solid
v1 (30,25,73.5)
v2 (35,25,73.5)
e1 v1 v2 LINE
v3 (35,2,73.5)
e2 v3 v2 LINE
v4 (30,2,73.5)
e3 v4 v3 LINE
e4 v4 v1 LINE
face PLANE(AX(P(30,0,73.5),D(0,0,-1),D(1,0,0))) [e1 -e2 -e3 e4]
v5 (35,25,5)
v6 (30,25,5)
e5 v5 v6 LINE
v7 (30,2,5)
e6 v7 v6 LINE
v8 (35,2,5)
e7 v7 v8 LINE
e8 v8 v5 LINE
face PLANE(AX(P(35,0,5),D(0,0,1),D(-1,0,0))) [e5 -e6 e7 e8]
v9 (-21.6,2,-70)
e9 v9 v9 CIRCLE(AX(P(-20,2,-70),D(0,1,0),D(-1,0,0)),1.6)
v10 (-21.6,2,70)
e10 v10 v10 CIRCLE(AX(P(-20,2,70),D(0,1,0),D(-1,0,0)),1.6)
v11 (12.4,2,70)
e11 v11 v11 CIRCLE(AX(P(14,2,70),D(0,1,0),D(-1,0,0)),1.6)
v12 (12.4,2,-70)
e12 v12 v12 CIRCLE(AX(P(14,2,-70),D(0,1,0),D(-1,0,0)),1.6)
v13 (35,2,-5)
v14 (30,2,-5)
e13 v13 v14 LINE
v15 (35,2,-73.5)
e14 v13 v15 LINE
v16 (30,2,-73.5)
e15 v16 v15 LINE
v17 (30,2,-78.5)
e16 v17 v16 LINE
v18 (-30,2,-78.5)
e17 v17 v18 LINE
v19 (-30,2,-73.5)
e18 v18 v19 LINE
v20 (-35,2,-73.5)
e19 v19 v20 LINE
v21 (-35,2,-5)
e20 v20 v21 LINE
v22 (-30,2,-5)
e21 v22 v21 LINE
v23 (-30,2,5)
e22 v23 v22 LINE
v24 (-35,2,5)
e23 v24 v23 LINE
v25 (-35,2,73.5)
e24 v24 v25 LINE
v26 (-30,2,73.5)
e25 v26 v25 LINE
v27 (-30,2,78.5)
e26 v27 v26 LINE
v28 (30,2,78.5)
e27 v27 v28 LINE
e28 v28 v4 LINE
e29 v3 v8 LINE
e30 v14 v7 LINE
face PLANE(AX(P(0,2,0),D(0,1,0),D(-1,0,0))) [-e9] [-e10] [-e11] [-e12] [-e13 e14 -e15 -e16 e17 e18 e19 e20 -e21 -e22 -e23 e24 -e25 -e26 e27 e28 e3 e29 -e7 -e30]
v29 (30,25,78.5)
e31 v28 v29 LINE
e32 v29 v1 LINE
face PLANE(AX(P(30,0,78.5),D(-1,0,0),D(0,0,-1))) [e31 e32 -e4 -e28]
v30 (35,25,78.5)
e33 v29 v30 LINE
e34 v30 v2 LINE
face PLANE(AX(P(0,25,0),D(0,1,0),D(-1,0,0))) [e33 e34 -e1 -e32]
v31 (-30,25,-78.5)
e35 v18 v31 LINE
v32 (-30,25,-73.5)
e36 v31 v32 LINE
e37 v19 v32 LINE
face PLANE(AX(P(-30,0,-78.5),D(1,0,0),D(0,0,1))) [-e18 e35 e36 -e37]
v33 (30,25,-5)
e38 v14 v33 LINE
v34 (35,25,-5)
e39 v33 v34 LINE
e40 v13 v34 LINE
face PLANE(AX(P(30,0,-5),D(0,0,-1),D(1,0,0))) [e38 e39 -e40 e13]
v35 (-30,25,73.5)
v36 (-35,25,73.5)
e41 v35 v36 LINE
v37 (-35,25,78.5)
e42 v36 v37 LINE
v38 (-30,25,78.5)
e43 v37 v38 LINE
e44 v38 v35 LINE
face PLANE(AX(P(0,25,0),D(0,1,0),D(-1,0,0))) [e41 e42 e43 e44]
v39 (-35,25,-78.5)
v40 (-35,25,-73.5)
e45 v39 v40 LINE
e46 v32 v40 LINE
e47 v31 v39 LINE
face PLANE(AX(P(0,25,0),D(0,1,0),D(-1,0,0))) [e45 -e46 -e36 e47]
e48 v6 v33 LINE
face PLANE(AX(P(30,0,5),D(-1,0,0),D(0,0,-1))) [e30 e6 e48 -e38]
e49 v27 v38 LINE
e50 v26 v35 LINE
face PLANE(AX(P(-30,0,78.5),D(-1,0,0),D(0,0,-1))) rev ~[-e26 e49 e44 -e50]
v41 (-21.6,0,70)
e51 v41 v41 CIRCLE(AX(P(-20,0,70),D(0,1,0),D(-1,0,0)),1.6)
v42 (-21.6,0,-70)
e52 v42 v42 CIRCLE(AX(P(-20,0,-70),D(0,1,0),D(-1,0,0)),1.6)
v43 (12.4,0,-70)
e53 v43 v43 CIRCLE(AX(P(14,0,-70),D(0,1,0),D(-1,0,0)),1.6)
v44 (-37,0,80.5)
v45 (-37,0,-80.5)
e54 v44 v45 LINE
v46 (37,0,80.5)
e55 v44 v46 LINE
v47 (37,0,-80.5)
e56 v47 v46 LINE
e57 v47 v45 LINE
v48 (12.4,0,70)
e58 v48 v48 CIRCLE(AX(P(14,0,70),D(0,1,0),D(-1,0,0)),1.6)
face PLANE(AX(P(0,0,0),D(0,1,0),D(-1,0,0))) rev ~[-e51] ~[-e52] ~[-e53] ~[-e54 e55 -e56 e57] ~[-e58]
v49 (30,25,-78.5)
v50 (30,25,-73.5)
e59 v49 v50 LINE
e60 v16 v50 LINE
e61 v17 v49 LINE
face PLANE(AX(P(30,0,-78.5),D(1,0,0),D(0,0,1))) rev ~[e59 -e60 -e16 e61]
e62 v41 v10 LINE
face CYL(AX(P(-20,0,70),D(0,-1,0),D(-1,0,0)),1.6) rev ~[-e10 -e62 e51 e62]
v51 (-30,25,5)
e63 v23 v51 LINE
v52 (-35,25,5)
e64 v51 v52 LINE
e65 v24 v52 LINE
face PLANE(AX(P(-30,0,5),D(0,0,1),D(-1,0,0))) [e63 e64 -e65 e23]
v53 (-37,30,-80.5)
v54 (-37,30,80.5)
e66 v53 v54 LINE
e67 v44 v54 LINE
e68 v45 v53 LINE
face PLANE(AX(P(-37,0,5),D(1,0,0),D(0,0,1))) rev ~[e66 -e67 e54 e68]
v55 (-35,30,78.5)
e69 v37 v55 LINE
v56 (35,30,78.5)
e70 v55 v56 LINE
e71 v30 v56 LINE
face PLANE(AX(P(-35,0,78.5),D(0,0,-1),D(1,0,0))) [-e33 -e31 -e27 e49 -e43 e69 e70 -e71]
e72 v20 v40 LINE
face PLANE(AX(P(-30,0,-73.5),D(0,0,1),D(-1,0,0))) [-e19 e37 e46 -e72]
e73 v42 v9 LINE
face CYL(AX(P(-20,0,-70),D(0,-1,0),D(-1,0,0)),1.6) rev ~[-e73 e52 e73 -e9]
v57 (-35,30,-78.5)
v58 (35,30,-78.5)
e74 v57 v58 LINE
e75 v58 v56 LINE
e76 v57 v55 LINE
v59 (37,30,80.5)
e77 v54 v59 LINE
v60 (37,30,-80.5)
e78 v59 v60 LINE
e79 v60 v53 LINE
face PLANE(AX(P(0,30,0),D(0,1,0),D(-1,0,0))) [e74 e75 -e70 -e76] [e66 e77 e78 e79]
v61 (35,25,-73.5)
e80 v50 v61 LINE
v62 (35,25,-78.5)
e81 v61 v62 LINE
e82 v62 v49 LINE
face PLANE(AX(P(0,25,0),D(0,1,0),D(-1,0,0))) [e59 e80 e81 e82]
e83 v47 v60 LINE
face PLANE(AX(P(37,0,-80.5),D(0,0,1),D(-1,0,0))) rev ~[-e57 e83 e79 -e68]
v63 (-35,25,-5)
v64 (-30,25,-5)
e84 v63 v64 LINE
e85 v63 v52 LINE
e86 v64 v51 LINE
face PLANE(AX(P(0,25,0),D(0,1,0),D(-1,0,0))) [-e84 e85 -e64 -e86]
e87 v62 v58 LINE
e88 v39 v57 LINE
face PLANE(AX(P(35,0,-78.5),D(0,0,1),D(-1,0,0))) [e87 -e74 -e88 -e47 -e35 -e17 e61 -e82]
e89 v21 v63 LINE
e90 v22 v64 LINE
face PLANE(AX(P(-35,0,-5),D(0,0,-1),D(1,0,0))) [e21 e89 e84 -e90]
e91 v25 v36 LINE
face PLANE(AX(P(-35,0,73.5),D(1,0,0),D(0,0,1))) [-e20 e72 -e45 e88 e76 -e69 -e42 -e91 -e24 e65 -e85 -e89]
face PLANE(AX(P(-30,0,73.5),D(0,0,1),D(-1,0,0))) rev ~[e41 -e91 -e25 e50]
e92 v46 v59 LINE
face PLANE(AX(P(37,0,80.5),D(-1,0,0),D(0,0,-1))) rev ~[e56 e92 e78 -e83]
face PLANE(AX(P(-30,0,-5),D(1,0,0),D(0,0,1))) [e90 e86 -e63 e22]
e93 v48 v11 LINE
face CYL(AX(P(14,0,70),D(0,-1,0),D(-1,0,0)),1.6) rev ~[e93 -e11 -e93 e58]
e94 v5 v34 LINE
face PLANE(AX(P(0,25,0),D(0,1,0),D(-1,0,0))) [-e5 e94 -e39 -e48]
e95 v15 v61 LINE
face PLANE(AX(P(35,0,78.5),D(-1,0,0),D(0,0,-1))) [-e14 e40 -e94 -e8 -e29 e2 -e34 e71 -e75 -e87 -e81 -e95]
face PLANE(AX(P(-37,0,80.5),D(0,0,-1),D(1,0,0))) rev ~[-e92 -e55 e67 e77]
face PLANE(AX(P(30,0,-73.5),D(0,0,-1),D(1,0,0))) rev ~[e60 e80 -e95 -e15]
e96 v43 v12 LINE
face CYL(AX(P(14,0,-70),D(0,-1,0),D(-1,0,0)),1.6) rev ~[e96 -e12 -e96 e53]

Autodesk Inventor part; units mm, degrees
ref_plane "YZ Plane" through (0, 0, 0) normal (1, 0, 0) x (0, 1, 0)
ref_plane "XZ Plane" through (0, 0, 0) normal (0, 1, 0) x (-1, 0, 0)
ref_plane "XY Plane" through (0, 0, 0) normal (0, 0, 1) x (1, 0, 0)
sketch "Sketch1" plane through (0, 0, 0) normal (0, 1, 0) x (-1, 0, 0)
  line L0 (55, 0) -> (-69, 0) construction
  line L1 (0, 72) -> (0, -101) construction
  line L2 (35, 78.5) -> (-35, 78.5)
  line L3 (-35, 78.5) -> (-35, -78.5)
  line L4 (-35, -78.5) -> (35, -78.5)
  line L5 (35, -78.5) -> (35, 78.5)
  line L6 (35, 78.5) -> (-35, -78.5) construction
  line L7 (-35, 78.5) -> (35, -78.5) construction
  line L8 (37, 80.5) -> (-37, 80.5)
  line L9 (-37, 80.5) -> (-37, -80.5)
  line L10 (-37, -80.5) -> (37, -80.5)
  line L11 (37, -80.5) -> (37, 80.5)
  line L12 (37, 80.5) -> (-37, -80.5) construction
  line L13 (-37, 80.5) -> (37, -80.5) construction
  circle A0 centre (20, -70) radius 1.6
  circle A1 centre (20, -70) radius 2.75
  circle A2 centre (-14, -70) radius 1.6
  circle A3 centre (-14, -70) radius 2.75
  circle A4 centre (20, 70) radius 1.6
  circle A5 centre (20, 70) radius 2.75
  circle A6 centre (-14, 70) radius 1.6
  circle A7 centre (-14, 70) radius 2.75
  line L14 (35, 78.5) -> (30, 78.5)
  line L15 (30, 78.5) -> (30, 73.5)
  line L16 (30, 73.5) -> (35, 73.5)
  line L17 (35, 73.5) -> (35, 78.5)
  line L18 (-35, 78.5) -> (-30, 78.5)
  line L19 (-30, 78.5) -> (-30, 73.5)
  line L20 (-30, 73.5) -> (-35, 73.5)
  line L21 (-35, 73.5) -> (-35, 78.5)
  line L22 (35, -78.5) -> (30, -78.5)
  line L23 (30, -78.5) -> (30, -73.5)
  line L24 (30, -73.5) -> (35, -73.5)
  line L25 (35, -73.5) -> (35, -78.5)
  line L26 (-35, -78.5) -> (-30, -78.5)
  line L27 (-30, -78.5) -> (-30, -73.5)
  line L28 (-30, -73.5) -> (-35, -73.5)
  line L29 (-35, -73.5) -> (-35, -78.5)
  line L30 (40, -5) -> (30, -5)
  line L31 (30, -5) -> (30, 5)
  line L32 (30, 5) -> (40, 5)
  line L33 (40, 5) -> (40, -5)
  line L34 (40, -5) -> (30, 5) construction
  line L35 (30, -5) -> (40, 5) construction
  line L36 (-30, -5) -> (-40, -5)
  line L37 (-40, -5) -> (-40, 5)
  line L38 (-40, 5) -> (-30, 5)
  line L39 (-30, 5) -> (-30, -5)
  line L40 (-30, -5) -> (-40, 5) construction
  line L41 (-40, -5) -> (-30, 5) construction
  point P0 (0, 0)
  point P1 (35, 0)
  point P2 (-35, 0)
  point P3 (-35, 5)
  point P4 (-35, -5)
  point P5 (35, -5)
  point P6 (35, 5)
  dimension "d0" = 70
  dimension "d1" = 157
  dimension "d2" = 74
  dimension "d3" = 161
  dimension "d4" = 3.2
  dimension "d5" = 17
  dimension "d6" = 70
  dimension "d7" = 5.5
  dimension "d8" = 3.2
  dimension "d9" = 5.5
  dimension "d10" = 34
  dimension "d11" = 5
  dimension "d12" = 5
  dimension "d13" = 5
  dimension "d14" = 5
  dimension "d15" = 5
  dimension "d16" = 5
  dimension "d17" = 5
extrude "Extrusion1" add sketch "Sketch1" along normal blind 2 contours L15 L16 L5 L32 L31 L30 L24 L23 L4 L27 L28 L3 L36 L39 L38 L20 L19 L2 | L5 L30 L31 L32 | L38 L39 L36 L3 | A1 | A3 | A5 | A7
extrude "Extrusion2" add sketch "Sketch1" along normal blind 25 contours L5 L16 L15 L2 | L19 L20 L3 L2 | L5 L30 L31 L32 | L5 L4 L23 L24 | L38 L39 L36 L3 | L28 L27 L4 L3
extrude "Extrusion3" add sketch "Sketch1" along normal blind 30 contours L2 L3 L38 L9 L8 L11 L32 L5 | L32 L11 L30 L5 | L30 L11 L10 L9 L36 L3 L4 L5 | L3 L36 L9 L38
properties part number "Mounting Master_3DPrint"
